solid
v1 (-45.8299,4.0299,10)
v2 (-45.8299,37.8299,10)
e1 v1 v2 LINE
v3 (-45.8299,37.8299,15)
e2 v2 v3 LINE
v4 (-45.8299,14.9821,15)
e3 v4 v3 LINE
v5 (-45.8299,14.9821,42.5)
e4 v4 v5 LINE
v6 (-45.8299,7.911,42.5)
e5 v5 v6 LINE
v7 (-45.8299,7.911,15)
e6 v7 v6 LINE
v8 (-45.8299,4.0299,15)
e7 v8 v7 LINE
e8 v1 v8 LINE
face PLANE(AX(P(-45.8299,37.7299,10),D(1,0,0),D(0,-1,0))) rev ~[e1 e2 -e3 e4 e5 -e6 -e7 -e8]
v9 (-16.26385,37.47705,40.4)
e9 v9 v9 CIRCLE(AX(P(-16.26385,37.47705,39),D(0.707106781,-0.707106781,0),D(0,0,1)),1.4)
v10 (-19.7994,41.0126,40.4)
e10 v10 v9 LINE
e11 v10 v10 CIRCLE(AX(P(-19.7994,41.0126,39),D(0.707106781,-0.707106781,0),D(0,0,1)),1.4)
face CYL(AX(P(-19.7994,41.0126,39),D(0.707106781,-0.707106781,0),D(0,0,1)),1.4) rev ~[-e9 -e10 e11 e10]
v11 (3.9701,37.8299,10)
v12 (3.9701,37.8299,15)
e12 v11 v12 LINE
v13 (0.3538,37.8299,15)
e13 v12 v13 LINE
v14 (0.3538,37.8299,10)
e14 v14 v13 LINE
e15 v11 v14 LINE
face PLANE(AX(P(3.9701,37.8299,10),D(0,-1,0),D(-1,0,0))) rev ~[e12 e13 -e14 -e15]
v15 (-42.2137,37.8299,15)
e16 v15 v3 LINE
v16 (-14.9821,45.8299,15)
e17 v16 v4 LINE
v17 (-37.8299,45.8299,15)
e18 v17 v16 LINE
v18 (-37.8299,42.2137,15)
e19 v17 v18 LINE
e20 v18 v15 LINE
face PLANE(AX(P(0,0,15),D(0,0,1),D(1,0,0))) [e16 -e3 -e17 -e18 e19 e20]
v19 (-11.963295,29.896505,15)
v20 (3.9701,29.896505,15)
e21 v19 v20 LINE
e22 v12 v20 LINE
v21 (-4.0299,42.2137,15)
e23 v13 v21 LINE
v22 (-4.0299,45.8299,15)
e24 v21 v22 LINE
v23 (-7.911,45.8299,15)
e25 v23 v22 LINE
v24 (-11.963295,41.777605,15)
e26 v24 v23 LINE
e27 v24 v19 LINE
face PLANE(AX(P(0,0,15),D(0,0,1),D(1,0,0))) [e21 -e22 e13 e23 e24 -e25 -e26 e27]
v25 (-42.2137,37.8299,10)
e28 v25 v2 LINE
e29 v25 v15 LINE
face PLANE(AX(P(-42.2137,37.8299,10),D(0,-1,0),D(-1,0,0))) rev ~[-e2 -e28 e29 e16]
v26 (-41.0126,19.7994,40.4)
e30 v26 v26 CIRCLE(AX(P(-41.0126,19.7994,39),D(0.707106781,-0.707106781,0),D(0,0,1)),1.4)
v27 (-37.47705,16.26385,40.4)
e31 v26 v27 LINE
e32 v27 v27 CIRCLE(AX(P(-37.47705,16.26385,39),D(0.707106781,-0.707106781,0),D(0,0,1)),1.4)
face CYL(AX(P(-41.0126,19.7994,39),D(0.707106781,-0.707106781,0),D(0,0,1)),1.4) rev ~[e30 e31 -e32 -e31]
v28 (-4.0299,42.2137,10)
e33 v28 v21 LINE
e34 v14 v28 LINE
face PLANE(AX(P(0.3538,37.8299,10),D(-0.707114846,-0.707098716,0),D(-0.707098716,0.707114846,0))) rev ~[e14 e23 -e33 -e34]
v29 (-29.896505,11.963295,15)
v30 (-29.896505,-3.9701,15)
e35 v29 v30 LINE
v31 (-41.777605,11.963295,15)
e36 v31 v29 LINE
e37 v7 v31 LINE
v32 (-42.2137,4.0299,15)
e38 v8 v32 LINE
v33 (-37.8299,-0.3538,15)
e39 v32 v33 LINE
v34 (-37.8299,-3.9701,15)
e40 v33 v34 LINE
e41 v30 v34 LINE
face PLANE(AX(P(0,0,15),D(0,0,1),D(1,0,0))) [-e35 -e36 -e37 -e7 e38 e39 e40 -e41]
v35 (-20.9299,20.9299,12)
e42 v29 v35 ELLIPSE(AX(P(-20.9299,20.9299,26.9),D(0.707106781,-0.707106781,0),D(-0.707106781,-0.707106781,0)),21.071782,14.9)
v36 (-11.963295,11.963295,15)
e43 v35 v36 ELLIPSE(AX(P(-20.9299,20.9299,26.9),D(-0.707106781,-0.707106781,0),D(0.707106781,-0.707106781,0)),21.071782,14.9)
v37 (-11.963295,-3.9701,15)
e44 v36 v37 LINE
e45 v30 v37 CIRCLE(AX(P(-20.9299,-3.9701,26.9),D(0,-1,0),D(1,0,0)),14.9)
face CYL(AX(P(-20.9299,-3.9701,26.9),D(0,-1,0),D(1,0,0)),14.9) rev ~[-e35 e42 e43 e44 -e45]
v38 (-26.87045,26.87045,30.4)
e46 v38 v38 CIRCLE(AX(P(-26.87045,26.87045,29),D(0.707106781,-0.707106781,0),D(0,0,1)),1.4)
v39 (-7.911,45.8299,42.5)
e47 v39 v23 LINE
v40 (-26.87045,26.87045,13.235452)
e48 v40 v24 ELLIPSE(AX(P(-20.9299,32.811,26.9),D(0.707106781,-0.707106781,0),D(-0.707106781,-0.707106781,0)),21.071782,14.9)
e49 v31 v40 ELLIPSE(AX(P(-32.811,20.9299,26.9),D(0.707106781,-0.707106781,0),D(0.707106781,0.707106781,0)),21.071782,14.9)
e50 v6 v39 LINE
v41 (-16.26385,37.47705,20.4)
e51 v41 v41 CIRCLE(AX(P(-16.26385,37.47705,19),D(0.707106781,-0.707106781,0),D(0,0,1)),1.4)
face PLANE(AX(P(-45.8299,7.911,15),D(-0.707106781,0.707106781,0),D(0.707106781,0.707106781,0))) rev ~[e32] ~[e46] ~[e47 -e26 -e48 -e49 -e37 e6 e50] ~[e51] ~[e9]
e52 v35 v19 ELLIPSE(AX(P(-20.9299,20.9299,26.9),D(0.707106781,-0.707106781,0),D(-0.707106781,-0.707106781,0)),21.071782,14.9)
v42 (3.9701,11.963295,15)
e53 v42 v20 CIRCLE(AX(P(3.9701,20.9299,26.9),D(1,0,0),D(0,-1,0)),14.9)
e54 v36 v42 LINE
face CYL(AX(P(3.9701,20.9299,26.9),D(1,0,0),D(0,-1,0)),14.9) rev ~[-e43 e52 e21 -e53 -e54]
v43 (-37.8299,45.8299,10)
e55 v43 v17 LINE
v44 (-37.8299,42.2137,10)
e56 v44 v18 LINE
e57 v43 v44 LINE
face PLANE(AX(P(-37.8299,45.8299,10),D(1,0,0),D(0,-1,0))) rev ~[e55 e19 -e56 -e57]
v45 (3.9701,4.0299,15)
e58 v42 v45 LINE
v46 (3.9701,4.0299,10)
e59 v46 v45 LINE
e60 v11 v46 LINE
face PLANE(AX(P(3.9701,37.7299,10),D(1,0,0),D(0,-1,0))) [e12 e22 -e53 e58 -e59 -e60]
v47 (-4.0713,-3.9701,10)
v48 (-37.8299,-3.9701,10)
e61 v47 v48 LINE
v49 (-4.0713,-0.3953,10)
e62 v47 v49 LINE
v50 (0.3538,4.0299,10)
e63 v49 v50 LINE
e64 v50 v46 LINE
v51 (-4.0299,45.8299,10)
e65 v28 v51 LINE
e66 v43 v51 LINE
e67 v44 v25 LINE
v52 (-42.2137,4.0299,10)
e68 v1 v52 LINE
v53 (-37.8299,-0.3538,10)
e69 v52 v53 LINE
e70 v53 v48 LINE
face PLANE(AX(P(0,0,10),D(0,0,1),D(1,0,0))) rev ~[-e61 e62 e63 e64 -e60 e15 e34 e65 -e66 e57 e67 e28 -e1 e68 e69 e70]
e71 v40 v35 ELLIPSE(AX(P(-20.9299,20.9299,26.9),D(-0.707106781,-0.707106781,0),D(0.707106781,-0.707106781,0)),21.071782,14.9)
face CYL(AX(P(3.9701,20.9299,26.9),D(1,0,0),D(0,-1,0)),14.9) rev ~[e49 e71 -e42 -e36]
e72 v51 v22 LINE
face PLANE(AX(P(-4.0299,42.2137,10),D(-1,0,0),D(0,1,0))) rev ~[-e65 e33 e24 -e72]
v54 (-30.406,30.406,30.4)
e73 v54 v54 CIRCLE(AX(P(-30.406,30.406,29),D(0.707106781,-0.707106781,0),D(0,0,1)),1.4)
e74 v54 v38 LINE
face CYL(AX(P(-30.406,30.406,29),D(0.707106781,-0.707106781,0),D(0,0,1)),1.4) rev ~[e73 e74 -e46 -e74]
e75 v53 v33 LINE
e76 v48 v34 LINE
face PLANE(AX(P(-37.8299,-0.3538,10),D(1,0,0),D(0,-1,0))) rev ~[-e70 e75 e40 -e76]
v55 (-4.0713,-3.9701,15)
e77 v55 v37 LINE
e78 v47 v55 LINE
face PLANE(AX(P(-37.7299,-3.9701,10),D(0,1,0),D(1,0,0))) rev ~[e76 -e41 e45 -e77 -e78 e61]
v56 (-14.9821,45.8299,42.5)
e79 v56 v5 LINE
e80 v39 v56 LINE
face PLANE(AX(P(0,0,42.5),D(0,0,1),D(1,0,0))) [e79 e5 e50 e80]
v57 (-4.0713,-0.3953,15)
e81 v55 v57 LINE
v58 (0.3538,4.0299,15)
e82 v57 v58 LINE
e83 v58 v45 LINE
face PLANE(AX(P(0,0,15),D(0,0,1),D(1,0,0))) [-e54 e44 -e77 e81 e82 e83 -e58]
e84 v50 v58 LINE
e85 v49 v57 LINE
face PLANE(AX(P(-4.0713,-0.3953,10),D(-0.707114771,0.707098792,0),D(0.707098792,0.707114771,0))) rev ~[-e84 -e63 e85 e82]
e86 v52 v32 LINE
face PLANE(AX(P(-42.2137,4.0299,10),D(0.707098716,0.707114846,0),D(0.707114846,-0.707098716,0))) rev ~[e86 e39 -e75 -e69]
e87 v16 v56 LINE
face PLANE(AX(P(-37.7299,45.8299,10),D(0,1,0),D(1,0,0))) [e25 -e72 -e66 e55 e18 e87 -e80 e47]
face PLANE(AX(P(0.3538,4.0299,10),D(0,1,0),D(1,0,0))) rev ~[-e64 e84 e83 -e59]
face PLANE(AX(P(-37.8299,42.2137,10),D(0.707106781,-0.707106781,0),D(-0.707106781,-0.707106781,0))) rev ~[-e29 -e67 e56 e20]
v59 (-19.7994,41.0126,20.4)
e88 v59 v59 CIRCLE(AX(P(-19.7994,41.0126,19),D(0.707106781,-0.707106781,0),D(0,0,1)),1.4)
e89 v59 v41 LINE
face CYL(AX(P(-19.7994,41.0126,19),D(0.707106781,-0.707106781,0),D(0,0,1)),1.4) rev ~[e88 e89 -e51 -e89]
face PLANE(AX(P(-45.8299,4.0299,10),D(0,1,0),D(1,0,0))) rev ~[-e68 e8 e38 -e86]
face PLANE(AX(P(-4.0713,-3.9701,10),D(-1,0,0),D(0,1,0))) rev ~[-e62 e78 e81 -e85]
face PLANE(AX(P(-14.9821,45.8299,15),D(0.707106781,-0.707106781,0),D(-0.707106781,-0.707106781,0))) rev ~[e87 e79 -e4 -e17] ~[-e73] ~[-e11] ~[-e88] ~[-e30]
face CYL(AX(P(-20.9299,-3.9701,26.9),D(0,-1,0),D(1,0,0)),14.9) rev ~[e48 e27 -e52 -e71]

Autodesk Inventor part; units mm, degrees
ref_plane "Work Plane1" through (0, 0, 10) normal (0, 0, 1) x (1, 0, 0)
sketch "Sketch1" plane through (0, 0, 10) normal (0, 0, 1) x (1, 0, 0)
  line L0 (-4.0299, -0.3538) -> (-2.2322, 1.4439) construction
  arc A0 (-1.4439, 2.2322) -> (-2.2322, 1.4439) centre (-0.9299, 0.9299) ccw construction
  line L1 (-1.4439, 2.2322) -> (0.3538, 4.0299) construction
  line L2 (-37.8299, 42.8299) -> (-37.8299, 37.8299) construction
  line L3 (-37.8299, 37.8299) -> (-42.9208, 37.8299) construction
  line L4 (-37.8299, 42.2137) -> (-37.8299, 45.8299) construction
  line L5 (-37.8299, 45.8299) -> (-4.0299, 45.8299) construction
  line L6 (-4.0299, 45.8299) -> (-4.0299, 42.2137) construction
  line L7 (-4.0299, 4.0299) -> (0.3538, 4.0299) projected
  circle A1 centre (-20.9299, 20.9299) radius 17.5 projected
  line L8 (-20.9299, 58.9723) -> (17.1124, 20.9299) construction
  line L9 (17.1124, 20.9299) -> (-20.9299, -17.1124) construction
  line L10 (-20.9299, -17.1124) -> (-58.9723, 20.9299) construction
  line L11 (-58.9723, 20.9299) -> (-20.9299, 58.9723) construction
  line L12 (-20.9299, 58.9723) -> (-20.9299, -17.1124) construction
  line L13 (17.1124, 20.9299) -> (-58.9723, 20.9299) construction
  line L14 (-20.9299, 58.9723) -> (32.8701, 58.9723) construction
  line L15 (-43.4299, 43.4299) -> (1.5701, 43.4299) construction
  line L16 (1.5701, 43.4299) -> (1.5701, -1.5701) construction
  line L17 (1.5701, -1.5701) -> (-43.4299, -1.5701) construction
  line L18 (-43.4299, -1.5701) -> (-43.4299, 43.4299) construction
  line L19 (-43.4299, 43.4299) -> (1.5701, -1.5701) construction
  line L20 (1.5701, 43.4299) -> (-43.4299, -1.5701) construction
  line L21 (-43.4299, 5.3876) -> (-43.4299, 36.4723)
  line L22 (-43.4299, 36.4723) -> (-36.4723, 43.4299)
  line L23 (-36.4723, 43.4299) -> (-5.3876, 43.4299)
  line L24 (-5.3876, 43.4299) -> (1.5701, 36.4723)
  line L25 (1.5701, 36.4723) -> (1.5701, 5.3876)
  line L26 (1.5701, 5.3876) -> (-5.3876, -1.5701)
  line L27 (-5.3876, -1.5701) -> (-36.4723, -1.5701)
  line L28 (-36.4723, -1.5701) -> (-43.4299, 5.3876)
  line L29 (-4.0299, 42.2137) -> (-37.8299, 42.2137) projected
  line L30 (-4.0299, -0.3538) -> (-4.0299, 4.0299) projected
  circle A2 centre (-20.9299, 20.9299) radius 1.4
  line L31 (-10.9299, 10.9299) -> (-30.9299, 10.9299) construction
  line L32 (-30.9299, 10.9299) -> (-30.9299, 30.9299) construction
  line L33 (-30.9299, 30.9299) -> (-10.9299, 30.9299) construction
  line L34 (-10.9299, 30.9299) -> (-10.9299, 10.9299) construction
  line L35 (-10.9299, 10.9299) -> (-30.9299, 30.9299) construction
  line L36 (-30.9299, 10.9299) -> (-10.9299, 30.9299) construction
  circle A3 centre (-30.9299, 30.9299) radius 1.4
  circle A4 centre (-30.9299, 10.9299) radius 1.4
  circle A5 centre (-10.9299, 10.9299) radius 1.4
  line L37 (-45.8299, 37.8299) -> (-42.0723, 37.8299) construction
  line L38 (-42.1723, 37.7299) -> (-45.8299, 37.7299)
  line L39 (-45.8299, 37.7299) -> (-45.8299, 4.1299)
  line L40 (-45.8299, 4.1299) -> (-42.1723, 4.1299)
  line L41 (-42.1723, 4.1299) -> (-42.1723, 37.7299)
  line L42 (-45.8299, 4.0299) -> (-42.0723, 4.0299) construction
  line L43 (-45.8299, 37.8299) -> (-42.0723, 37.8299) projected
  line L44 (-37.7299, 45.8299) -> (-4.1299, 45.8299)
  line L45 (-4.1299, 45.8299) -> (-4.1299, 42.1723)
  line L46 (-4.1299, 42.1723) -> (-37.7299, 42.1723)
  line L47 (-37.7299, 42.1723) -> (-37.7299, 45.8299)
  line L48 (0.4701, 37.8299) -> (0.4701, 4.0299) construction
  line L49 (0.4701, 4.0299) -> (3.9701, 4.0299) construction
  line L50 (3.9701, 37.8299) -> (3.9701, 4.0299) construction
  line L51 (0.4701, 37.8299) -> (3.9701, 37.8299) construction
  line L52 (-45.8299, -3.9701) -> (-4.0299, -3.9701) construction
  line L53 (0.3124, 37.7299) -> (3.9701, 37.7299)
  line L54 (3.9701, 37.7299) -> (3.9701, 4.1299)
  line L55 (3.9701, 4.1299) -> (0.3124, 4.1299)
  line L56 (0.3124, 4.1299) -> (0.3124, 37.7299)
  line L57 (-4.1713, -0.3538) -> (-37.7299, -0.3538)
  line L58 (-37.7299, -0.3538) -> (-37.7299, -3.9701)
  line L59 (-37.7299, -3.9701) -> (-4.1713, -3.9701)
  line L60 (-4.1713, -3.9701) -> (-4.1713, -0.3538)
  point P0 (-37.8299, 4.0299)
  dimension "d18" = 53.8
  dimension "d19" = 45
  dimension "d20" = 53.8
  dimension "d21" = 45
  dimension "d22" = 45
  dimension "d30" = 20
  dimension "d31" = 20
  dimension "d32" = 2.8
  dimension "d33" = 2.8
  dimension "d34" = 2.8
  dimension "d35" = 2.8
  dimension "d36" = 0.1
  dimension "d37" = 0.1
  dimension "d38" = 0.1
  dimension "d39" = 0.1
extrude "Extrusion1" add sketch "Sketch1" along normal blind 5 contours L30 L26 L57 L28 L41 L22 L46 L24 L56 L7 | L7 L26 L30 | L56 L24 L25 L26 | L26 L25 L24 L53 L54 L55 | L60 L59 L58 L57 L28 L27 L26 | L26 L27 L28 L57 | L46 L22 L29 L24 | L24 L29 L45 | L40 L39 L38 L22 L21 L28 | L28 L21 L22 L41 | L29 L22 L23 L24 | L24 L23 L22 L29 L47 L44 L45 | L47 L29 L22 | A1 | A2 | A3 | A4 | A5
sketch "Sketch4" plane through (0, 0, 15) normal (0, 0, 1) x (1, 0, 0)
  line L0 (-37.7299, 42.1723) -> (-42.1723, 37.7299) projected
  line L1 (-42.1723, 37.7299) -> (-45.8299, 37.7299) projected
  line L2 (-45.8299, 37.7299) -> (-45.8299, 4.1299) projected
  line L3 (-45.8299, 4.1299) -> (-42.1723, 4.1299) projected
  line L4 (-42.1723, 4.1299) -> (-37.6885, -0.3538) projected
  line L5 (-37.6885, -0.3538) -> (-37.7299, -0.3538) projected
  line L6 (-37.7299, -0.3538) -> (-37.7299, -3.9701) projected
  line L7 (-37.7299, -3.9701) -> (-4.1713, -3.9701) projected
  line L8 (-4.1713, -3.9701) -> (-4.1713, -0.3538) projected
  line L9 (-4.1713, -0.3538) -> (0.3124, 4.1299) projected
  line L10 (0.3124, 4.1299) -> (3.9701, 4.1299) projected
  line L11 (3.9701, 4.1299) -> (3.9701, 37.7299) projected
  line L12 (3.9701, 37.7299) -> (0.3124, 37.7299) projected
  line L13 (0.3124, 37.7299) -> (-4.1299, 42.1723) projected
  line L14 (-4.1299, 42.1723) -> (-4.1299, 45.8299) projected
  line L15 (-4.1299, 45.8299) -> (-37.7299, 45.8299) projected
  line L16 (-37.7299, 45.8299) -> (-37.7299, 42.1723) projected
  line L17 (-45.8299, 37.7299) -> (-45.8299, 4.1299) projected
  line L18 (-45.8299, 7.911) -> (-7.911, 45.8299)
  line L19 (-45.8299, 7.911) -> (7.7955, 7.911) construction
  line L20 (-7.911, 45.8299) -> (-14.9821, 45.8299)
  line L21 (-4.1299, 45.8299) -> (-37.7299, 45.8299) projected
  line L22 (-14.9821, 45.8299) -> (-45.8299, 14.9821)
  line L23 (-45.8299, 7.911) -> (-45.8299, 14.9821)
  circle A0 centre (-40.9299, 0.9299) radius 1.1933 projected
  circle A1 centre (-0.9299, 40.9299) radius 1.4 projected
  line L24 (-40.9299, 0.9299) -> (-0.9299, 40.9299)
  line L25 (0.3124, 37.7299) -> (-4.1299, 42.1723) projected
  point P0 (0, 0)
  dimension "d40" = 45
  dimension "d41" = 5
extrude "Extrusion4" add sketch "Sketch4" along normal blind 27.5 contours L15 L18 L2 L22
sketch "Sketch5" plane through (-45.8299, 14.9821, 15) normal (-0.7071068, 0.7071068, 0) x (-0.7071068, -0.7071068, 0)
  line L0 (0, 0) -> (-43.6254, 0) projected
  line L1 (0, 0) -> (0, 27.5) projected
  line L2 (-43.6254, 27.5) -> (0, 27.5) projected
  line L3 (-43.6254, 0) -> (-43.6254, 27.5) projected
  circle A0 centre (-21.8127, 5.6873) radius 21.8127
  line L4 (-6.8127, 24) -> (-36.8127, 24) construction
  line L5 (-36.8127, 24) -> (-36.8127, 4) construction
  line L6 (-36.8127, 4) -> (-6.8127, 4) construction
  line L7 (-6.8127, 4) -> (-6.8127, 24) construction
  line L8 (-6.8127, 24) -> (-36.8127, 4) construction
  line L9 (-36.8127, 24) -> (-6.8127, 4) construction
  point P0 (-21.8127, -15)
  point P1 (-21.8127, 14)
  dimension "d44" = 30
  dimension "d45" = 20
hole "Hole1" at (-19.7994, 41.0126, 39) at (-19.7994, 41.0126, 19) at (-41.0126, 19.7994, 39) at (-30.406, 30.406, 29) direction (0.7071068, -0.7071068, 0) diameter 2.8 depth 12
sketch "Sketch6" plane through (-37.7299, -3.9701, 10) normal (0, -1, 0) x (1, 0, 0)
  circle A0 centre (-3.2, 36.9) radius 1.45 projected
  circle A1 centre (36.8, 36.9) radius 1.45 projected
  line L0 (-6.1, 0) -> (-6.1, 39.8) projected
  line L1 (-0.1, 0) -> (-6.1, 0) projected
  line L2 (-0.1, 33.8) -> (-0.1, 0) projected
  line L3 (33.7, 33.8) -> (-0.1, 33.8) projected
  line L4 (33.7, 33.8) -> (33.7, 0) projected
  line L5 (39.7, 0) -> (33.7, 0) projected
  line L6 (39.7, 39.8) -> (39.7, 0) projected
  line L7 (-6.1, 39.8) -> (39.7, 39.8) projected
  circle A2 centre (16.8, 16.9) radius 16.9
  circle A3 centre (16.8, 16.9) radius 14.9
  line L8 (-0.1, 16.9) -> (-0.1, 0)
  line L9 (0, 0) -> (33.5586, 0) projected
  line L10 (0.0414, 0) -> (-4.4423, 0) projected
  line L11 (33.5586, 0) -> (0.0414, 0)
  line L12 (33.7, 16.9) -> (33.5586, 0)
  point P0 (37.7299, -10)
  dimension "d53" = 2
extrude "Extrusion5" cut sketch "Sketch6" against normal up to surface contours A3 surface through (-45.8299, 7.911, 15) normal (0.7071068, -0.7071068, 0)
ref_plane "Work Plane3" through (3.9701, 45.8299, 26) normal (1, 0, 0) x (0, -1, 0)
sketch "Sketch7" plane through (3.9701, 45.8299, 26) normal (1, 0, 0) x (0, -1, 0)
  line L0 (41.8, -17.8) -> (41.8, 16)
  line L1 (8, -17.8) -> (41.8, -17.8)
  line L2 (8, -17.8) -> (8, 16)
  circle A0 centre (24.9, -0.9) radius 16.9
  circle A1 centre (24.9, -0.9) radius 14.9
  point P0 (45.8299, 26)
  dimension "d56" = 2
ref_plane "Work Plane4" through (-34.8055, 8.3289, 16.6138) normal (0.7071068, -0.7071068, 0) x (0.7071068, 0.7071068, 0)
extrude "Extrusion6" cut sketch "Sketch7" against normal up to surface contours A1 surface through (-45.8299, 7.911, 15) normal (0.7071068, -0.7071068, 0)
sketch "Skizze8" plane through (0, 0, 10) normal (0, 0, -1) x (-1, 0, 0)
  line L0 (42.1723, 37.7299) -> (37.7299, 42.1723) projected
  line L1 (37.7299, 45.8299) -> (37.7299, 42.1723) projected
  line L2 (4.1299, 45.8299) -> (37.7299, 45.8299) construction
  line L3 (4.1299, 42.1723) -> (4.1299, 45.8299) projected
  line L4 (4.1299, 42.1723) -> (-0.3124, 37.7299) projected
  line L5 (-3.9701, 37.7299) -> (-0.3124, 37.7299) projected
  line L6 (-3.9701, 4.1299) -> (-3.9701, 37.7299) construction
  line L7 (-0.3124, 4.1299) -> (-3.9701, 4.1299) projected
  line L8 (-0.3124, 4.1299) -> (4.1713, -0.3538) projected
  line L9 (4.1713, -3.9701) -> (4.1713, -0.3538) projected
  line L10 (37.7299, -3.9701) -> (4.1713, -3.9701) construction
  line L11 (37.7299, -0.3538) -> (37.7299, -3.9701) projected
  line L12 (37.6885, -0.3538) -> (37.7299, -0.3538) projected
  line L13 (37.6885, -0.3538) -> (42.1723, 4.1299) projected
  line L14 (45.8299, 4.1299) -> (42.1723, 4.1299) projected
  line L15 (45.8299, 37.7299) -> (45.8299, 4.1299) construction
  line L16 (42.1723, 37.7299) -> (45.8299, 37.7299) projected
  line L17 (45.9299, 4.0299) -> (42.2137, 4.0299)
  line L18 (42.2137, 4.0299) -> (37.8299, -0.3538)
  line L19 (37.8299, -0.3538) -> (37.8299, -4.0701)
  line L20 (37.8299, -4.0701) -> (4.0713, -4.0701) construction
  line L21 (4.0713, -4.0701) -> (4.0713, -0.3953)
  line L22 (4.0713, -0.3953) -> (-0.3538, 4.0299)
  line L23 (-0.3538, 4.0299) -> (-4.0701, 4.0299)
  line L24 (-4.0701, 4.0299) -> (-4.0701, 37.8299) construction
  line L25 (-4.0701, 37.8299) -> (-0.3538, 37.8299)
  line L26 (-0.3538, 37.8299) -> (4.0299, 42.2137)
  line L27 (4.0299, 42.2137) -> (4.0299, 45.9299)
  line L28 (4.0299, 45.9299) -> (37.8299, 45.9299) construction
  line L29 (37.8299, 45.9299) -> (37.8299, 42.2137)
  line L30 (37.8299, 42.2137) -> (42.2137, 37.8299)
  line L31 (42.2137, 37.8299) -> (45.9299, 37.8299)
  line L32 (45.9299, 37.8299) -> (45.9299, 4.0299) construction
  line L33 (37.7299, 45.8299) -> (37.7299, 42.1723) projected
  line L34 (37.7299, 45.8299) -> (37.8299, 45.8299)
  line L35 (42.1723, 37.7299) -> (45.8299, 37.7299) projected
  line L36 (45.8299, 37.7299) -> (45.8299, 37.8299)
  line L37 (45.8299, 4.1299) -> (45.8299, 4.0299)
  line L38 (37.7299, -3.9701) -> (4.1713, -3.9701) projected
  line L39 (37.7299, -3.9701) -> (37.8299, -3.9701)
  line L40 (4.1713, -3.9701) -> (4.0713, -3.9701)
  line L41 (-3.9701, 4.1299) -> (-3.9701, 4.0299)
  line L42 (-3.9701, 37.7299) -> (-0.3124, 37.7299) projected
  line L43 (-3.9701, 37.7299) -> (-3.9701, 37.8299)
  line L44 (4.1299, 42.1723) -> (4.1299, 45.8299) projected
  line L45 (4.1299, 45.8299) -> (4.0299, 45.8299)
  point P0 (0, 0)
  dimension "d59" = 0.1
extrude "IM_offset" add sketch "Skizze8" against normal up to surface (5 mm away)
properties part number "20_Cube_Insert_Kinematic_Mirrormount_45_base_v3_aaa"
